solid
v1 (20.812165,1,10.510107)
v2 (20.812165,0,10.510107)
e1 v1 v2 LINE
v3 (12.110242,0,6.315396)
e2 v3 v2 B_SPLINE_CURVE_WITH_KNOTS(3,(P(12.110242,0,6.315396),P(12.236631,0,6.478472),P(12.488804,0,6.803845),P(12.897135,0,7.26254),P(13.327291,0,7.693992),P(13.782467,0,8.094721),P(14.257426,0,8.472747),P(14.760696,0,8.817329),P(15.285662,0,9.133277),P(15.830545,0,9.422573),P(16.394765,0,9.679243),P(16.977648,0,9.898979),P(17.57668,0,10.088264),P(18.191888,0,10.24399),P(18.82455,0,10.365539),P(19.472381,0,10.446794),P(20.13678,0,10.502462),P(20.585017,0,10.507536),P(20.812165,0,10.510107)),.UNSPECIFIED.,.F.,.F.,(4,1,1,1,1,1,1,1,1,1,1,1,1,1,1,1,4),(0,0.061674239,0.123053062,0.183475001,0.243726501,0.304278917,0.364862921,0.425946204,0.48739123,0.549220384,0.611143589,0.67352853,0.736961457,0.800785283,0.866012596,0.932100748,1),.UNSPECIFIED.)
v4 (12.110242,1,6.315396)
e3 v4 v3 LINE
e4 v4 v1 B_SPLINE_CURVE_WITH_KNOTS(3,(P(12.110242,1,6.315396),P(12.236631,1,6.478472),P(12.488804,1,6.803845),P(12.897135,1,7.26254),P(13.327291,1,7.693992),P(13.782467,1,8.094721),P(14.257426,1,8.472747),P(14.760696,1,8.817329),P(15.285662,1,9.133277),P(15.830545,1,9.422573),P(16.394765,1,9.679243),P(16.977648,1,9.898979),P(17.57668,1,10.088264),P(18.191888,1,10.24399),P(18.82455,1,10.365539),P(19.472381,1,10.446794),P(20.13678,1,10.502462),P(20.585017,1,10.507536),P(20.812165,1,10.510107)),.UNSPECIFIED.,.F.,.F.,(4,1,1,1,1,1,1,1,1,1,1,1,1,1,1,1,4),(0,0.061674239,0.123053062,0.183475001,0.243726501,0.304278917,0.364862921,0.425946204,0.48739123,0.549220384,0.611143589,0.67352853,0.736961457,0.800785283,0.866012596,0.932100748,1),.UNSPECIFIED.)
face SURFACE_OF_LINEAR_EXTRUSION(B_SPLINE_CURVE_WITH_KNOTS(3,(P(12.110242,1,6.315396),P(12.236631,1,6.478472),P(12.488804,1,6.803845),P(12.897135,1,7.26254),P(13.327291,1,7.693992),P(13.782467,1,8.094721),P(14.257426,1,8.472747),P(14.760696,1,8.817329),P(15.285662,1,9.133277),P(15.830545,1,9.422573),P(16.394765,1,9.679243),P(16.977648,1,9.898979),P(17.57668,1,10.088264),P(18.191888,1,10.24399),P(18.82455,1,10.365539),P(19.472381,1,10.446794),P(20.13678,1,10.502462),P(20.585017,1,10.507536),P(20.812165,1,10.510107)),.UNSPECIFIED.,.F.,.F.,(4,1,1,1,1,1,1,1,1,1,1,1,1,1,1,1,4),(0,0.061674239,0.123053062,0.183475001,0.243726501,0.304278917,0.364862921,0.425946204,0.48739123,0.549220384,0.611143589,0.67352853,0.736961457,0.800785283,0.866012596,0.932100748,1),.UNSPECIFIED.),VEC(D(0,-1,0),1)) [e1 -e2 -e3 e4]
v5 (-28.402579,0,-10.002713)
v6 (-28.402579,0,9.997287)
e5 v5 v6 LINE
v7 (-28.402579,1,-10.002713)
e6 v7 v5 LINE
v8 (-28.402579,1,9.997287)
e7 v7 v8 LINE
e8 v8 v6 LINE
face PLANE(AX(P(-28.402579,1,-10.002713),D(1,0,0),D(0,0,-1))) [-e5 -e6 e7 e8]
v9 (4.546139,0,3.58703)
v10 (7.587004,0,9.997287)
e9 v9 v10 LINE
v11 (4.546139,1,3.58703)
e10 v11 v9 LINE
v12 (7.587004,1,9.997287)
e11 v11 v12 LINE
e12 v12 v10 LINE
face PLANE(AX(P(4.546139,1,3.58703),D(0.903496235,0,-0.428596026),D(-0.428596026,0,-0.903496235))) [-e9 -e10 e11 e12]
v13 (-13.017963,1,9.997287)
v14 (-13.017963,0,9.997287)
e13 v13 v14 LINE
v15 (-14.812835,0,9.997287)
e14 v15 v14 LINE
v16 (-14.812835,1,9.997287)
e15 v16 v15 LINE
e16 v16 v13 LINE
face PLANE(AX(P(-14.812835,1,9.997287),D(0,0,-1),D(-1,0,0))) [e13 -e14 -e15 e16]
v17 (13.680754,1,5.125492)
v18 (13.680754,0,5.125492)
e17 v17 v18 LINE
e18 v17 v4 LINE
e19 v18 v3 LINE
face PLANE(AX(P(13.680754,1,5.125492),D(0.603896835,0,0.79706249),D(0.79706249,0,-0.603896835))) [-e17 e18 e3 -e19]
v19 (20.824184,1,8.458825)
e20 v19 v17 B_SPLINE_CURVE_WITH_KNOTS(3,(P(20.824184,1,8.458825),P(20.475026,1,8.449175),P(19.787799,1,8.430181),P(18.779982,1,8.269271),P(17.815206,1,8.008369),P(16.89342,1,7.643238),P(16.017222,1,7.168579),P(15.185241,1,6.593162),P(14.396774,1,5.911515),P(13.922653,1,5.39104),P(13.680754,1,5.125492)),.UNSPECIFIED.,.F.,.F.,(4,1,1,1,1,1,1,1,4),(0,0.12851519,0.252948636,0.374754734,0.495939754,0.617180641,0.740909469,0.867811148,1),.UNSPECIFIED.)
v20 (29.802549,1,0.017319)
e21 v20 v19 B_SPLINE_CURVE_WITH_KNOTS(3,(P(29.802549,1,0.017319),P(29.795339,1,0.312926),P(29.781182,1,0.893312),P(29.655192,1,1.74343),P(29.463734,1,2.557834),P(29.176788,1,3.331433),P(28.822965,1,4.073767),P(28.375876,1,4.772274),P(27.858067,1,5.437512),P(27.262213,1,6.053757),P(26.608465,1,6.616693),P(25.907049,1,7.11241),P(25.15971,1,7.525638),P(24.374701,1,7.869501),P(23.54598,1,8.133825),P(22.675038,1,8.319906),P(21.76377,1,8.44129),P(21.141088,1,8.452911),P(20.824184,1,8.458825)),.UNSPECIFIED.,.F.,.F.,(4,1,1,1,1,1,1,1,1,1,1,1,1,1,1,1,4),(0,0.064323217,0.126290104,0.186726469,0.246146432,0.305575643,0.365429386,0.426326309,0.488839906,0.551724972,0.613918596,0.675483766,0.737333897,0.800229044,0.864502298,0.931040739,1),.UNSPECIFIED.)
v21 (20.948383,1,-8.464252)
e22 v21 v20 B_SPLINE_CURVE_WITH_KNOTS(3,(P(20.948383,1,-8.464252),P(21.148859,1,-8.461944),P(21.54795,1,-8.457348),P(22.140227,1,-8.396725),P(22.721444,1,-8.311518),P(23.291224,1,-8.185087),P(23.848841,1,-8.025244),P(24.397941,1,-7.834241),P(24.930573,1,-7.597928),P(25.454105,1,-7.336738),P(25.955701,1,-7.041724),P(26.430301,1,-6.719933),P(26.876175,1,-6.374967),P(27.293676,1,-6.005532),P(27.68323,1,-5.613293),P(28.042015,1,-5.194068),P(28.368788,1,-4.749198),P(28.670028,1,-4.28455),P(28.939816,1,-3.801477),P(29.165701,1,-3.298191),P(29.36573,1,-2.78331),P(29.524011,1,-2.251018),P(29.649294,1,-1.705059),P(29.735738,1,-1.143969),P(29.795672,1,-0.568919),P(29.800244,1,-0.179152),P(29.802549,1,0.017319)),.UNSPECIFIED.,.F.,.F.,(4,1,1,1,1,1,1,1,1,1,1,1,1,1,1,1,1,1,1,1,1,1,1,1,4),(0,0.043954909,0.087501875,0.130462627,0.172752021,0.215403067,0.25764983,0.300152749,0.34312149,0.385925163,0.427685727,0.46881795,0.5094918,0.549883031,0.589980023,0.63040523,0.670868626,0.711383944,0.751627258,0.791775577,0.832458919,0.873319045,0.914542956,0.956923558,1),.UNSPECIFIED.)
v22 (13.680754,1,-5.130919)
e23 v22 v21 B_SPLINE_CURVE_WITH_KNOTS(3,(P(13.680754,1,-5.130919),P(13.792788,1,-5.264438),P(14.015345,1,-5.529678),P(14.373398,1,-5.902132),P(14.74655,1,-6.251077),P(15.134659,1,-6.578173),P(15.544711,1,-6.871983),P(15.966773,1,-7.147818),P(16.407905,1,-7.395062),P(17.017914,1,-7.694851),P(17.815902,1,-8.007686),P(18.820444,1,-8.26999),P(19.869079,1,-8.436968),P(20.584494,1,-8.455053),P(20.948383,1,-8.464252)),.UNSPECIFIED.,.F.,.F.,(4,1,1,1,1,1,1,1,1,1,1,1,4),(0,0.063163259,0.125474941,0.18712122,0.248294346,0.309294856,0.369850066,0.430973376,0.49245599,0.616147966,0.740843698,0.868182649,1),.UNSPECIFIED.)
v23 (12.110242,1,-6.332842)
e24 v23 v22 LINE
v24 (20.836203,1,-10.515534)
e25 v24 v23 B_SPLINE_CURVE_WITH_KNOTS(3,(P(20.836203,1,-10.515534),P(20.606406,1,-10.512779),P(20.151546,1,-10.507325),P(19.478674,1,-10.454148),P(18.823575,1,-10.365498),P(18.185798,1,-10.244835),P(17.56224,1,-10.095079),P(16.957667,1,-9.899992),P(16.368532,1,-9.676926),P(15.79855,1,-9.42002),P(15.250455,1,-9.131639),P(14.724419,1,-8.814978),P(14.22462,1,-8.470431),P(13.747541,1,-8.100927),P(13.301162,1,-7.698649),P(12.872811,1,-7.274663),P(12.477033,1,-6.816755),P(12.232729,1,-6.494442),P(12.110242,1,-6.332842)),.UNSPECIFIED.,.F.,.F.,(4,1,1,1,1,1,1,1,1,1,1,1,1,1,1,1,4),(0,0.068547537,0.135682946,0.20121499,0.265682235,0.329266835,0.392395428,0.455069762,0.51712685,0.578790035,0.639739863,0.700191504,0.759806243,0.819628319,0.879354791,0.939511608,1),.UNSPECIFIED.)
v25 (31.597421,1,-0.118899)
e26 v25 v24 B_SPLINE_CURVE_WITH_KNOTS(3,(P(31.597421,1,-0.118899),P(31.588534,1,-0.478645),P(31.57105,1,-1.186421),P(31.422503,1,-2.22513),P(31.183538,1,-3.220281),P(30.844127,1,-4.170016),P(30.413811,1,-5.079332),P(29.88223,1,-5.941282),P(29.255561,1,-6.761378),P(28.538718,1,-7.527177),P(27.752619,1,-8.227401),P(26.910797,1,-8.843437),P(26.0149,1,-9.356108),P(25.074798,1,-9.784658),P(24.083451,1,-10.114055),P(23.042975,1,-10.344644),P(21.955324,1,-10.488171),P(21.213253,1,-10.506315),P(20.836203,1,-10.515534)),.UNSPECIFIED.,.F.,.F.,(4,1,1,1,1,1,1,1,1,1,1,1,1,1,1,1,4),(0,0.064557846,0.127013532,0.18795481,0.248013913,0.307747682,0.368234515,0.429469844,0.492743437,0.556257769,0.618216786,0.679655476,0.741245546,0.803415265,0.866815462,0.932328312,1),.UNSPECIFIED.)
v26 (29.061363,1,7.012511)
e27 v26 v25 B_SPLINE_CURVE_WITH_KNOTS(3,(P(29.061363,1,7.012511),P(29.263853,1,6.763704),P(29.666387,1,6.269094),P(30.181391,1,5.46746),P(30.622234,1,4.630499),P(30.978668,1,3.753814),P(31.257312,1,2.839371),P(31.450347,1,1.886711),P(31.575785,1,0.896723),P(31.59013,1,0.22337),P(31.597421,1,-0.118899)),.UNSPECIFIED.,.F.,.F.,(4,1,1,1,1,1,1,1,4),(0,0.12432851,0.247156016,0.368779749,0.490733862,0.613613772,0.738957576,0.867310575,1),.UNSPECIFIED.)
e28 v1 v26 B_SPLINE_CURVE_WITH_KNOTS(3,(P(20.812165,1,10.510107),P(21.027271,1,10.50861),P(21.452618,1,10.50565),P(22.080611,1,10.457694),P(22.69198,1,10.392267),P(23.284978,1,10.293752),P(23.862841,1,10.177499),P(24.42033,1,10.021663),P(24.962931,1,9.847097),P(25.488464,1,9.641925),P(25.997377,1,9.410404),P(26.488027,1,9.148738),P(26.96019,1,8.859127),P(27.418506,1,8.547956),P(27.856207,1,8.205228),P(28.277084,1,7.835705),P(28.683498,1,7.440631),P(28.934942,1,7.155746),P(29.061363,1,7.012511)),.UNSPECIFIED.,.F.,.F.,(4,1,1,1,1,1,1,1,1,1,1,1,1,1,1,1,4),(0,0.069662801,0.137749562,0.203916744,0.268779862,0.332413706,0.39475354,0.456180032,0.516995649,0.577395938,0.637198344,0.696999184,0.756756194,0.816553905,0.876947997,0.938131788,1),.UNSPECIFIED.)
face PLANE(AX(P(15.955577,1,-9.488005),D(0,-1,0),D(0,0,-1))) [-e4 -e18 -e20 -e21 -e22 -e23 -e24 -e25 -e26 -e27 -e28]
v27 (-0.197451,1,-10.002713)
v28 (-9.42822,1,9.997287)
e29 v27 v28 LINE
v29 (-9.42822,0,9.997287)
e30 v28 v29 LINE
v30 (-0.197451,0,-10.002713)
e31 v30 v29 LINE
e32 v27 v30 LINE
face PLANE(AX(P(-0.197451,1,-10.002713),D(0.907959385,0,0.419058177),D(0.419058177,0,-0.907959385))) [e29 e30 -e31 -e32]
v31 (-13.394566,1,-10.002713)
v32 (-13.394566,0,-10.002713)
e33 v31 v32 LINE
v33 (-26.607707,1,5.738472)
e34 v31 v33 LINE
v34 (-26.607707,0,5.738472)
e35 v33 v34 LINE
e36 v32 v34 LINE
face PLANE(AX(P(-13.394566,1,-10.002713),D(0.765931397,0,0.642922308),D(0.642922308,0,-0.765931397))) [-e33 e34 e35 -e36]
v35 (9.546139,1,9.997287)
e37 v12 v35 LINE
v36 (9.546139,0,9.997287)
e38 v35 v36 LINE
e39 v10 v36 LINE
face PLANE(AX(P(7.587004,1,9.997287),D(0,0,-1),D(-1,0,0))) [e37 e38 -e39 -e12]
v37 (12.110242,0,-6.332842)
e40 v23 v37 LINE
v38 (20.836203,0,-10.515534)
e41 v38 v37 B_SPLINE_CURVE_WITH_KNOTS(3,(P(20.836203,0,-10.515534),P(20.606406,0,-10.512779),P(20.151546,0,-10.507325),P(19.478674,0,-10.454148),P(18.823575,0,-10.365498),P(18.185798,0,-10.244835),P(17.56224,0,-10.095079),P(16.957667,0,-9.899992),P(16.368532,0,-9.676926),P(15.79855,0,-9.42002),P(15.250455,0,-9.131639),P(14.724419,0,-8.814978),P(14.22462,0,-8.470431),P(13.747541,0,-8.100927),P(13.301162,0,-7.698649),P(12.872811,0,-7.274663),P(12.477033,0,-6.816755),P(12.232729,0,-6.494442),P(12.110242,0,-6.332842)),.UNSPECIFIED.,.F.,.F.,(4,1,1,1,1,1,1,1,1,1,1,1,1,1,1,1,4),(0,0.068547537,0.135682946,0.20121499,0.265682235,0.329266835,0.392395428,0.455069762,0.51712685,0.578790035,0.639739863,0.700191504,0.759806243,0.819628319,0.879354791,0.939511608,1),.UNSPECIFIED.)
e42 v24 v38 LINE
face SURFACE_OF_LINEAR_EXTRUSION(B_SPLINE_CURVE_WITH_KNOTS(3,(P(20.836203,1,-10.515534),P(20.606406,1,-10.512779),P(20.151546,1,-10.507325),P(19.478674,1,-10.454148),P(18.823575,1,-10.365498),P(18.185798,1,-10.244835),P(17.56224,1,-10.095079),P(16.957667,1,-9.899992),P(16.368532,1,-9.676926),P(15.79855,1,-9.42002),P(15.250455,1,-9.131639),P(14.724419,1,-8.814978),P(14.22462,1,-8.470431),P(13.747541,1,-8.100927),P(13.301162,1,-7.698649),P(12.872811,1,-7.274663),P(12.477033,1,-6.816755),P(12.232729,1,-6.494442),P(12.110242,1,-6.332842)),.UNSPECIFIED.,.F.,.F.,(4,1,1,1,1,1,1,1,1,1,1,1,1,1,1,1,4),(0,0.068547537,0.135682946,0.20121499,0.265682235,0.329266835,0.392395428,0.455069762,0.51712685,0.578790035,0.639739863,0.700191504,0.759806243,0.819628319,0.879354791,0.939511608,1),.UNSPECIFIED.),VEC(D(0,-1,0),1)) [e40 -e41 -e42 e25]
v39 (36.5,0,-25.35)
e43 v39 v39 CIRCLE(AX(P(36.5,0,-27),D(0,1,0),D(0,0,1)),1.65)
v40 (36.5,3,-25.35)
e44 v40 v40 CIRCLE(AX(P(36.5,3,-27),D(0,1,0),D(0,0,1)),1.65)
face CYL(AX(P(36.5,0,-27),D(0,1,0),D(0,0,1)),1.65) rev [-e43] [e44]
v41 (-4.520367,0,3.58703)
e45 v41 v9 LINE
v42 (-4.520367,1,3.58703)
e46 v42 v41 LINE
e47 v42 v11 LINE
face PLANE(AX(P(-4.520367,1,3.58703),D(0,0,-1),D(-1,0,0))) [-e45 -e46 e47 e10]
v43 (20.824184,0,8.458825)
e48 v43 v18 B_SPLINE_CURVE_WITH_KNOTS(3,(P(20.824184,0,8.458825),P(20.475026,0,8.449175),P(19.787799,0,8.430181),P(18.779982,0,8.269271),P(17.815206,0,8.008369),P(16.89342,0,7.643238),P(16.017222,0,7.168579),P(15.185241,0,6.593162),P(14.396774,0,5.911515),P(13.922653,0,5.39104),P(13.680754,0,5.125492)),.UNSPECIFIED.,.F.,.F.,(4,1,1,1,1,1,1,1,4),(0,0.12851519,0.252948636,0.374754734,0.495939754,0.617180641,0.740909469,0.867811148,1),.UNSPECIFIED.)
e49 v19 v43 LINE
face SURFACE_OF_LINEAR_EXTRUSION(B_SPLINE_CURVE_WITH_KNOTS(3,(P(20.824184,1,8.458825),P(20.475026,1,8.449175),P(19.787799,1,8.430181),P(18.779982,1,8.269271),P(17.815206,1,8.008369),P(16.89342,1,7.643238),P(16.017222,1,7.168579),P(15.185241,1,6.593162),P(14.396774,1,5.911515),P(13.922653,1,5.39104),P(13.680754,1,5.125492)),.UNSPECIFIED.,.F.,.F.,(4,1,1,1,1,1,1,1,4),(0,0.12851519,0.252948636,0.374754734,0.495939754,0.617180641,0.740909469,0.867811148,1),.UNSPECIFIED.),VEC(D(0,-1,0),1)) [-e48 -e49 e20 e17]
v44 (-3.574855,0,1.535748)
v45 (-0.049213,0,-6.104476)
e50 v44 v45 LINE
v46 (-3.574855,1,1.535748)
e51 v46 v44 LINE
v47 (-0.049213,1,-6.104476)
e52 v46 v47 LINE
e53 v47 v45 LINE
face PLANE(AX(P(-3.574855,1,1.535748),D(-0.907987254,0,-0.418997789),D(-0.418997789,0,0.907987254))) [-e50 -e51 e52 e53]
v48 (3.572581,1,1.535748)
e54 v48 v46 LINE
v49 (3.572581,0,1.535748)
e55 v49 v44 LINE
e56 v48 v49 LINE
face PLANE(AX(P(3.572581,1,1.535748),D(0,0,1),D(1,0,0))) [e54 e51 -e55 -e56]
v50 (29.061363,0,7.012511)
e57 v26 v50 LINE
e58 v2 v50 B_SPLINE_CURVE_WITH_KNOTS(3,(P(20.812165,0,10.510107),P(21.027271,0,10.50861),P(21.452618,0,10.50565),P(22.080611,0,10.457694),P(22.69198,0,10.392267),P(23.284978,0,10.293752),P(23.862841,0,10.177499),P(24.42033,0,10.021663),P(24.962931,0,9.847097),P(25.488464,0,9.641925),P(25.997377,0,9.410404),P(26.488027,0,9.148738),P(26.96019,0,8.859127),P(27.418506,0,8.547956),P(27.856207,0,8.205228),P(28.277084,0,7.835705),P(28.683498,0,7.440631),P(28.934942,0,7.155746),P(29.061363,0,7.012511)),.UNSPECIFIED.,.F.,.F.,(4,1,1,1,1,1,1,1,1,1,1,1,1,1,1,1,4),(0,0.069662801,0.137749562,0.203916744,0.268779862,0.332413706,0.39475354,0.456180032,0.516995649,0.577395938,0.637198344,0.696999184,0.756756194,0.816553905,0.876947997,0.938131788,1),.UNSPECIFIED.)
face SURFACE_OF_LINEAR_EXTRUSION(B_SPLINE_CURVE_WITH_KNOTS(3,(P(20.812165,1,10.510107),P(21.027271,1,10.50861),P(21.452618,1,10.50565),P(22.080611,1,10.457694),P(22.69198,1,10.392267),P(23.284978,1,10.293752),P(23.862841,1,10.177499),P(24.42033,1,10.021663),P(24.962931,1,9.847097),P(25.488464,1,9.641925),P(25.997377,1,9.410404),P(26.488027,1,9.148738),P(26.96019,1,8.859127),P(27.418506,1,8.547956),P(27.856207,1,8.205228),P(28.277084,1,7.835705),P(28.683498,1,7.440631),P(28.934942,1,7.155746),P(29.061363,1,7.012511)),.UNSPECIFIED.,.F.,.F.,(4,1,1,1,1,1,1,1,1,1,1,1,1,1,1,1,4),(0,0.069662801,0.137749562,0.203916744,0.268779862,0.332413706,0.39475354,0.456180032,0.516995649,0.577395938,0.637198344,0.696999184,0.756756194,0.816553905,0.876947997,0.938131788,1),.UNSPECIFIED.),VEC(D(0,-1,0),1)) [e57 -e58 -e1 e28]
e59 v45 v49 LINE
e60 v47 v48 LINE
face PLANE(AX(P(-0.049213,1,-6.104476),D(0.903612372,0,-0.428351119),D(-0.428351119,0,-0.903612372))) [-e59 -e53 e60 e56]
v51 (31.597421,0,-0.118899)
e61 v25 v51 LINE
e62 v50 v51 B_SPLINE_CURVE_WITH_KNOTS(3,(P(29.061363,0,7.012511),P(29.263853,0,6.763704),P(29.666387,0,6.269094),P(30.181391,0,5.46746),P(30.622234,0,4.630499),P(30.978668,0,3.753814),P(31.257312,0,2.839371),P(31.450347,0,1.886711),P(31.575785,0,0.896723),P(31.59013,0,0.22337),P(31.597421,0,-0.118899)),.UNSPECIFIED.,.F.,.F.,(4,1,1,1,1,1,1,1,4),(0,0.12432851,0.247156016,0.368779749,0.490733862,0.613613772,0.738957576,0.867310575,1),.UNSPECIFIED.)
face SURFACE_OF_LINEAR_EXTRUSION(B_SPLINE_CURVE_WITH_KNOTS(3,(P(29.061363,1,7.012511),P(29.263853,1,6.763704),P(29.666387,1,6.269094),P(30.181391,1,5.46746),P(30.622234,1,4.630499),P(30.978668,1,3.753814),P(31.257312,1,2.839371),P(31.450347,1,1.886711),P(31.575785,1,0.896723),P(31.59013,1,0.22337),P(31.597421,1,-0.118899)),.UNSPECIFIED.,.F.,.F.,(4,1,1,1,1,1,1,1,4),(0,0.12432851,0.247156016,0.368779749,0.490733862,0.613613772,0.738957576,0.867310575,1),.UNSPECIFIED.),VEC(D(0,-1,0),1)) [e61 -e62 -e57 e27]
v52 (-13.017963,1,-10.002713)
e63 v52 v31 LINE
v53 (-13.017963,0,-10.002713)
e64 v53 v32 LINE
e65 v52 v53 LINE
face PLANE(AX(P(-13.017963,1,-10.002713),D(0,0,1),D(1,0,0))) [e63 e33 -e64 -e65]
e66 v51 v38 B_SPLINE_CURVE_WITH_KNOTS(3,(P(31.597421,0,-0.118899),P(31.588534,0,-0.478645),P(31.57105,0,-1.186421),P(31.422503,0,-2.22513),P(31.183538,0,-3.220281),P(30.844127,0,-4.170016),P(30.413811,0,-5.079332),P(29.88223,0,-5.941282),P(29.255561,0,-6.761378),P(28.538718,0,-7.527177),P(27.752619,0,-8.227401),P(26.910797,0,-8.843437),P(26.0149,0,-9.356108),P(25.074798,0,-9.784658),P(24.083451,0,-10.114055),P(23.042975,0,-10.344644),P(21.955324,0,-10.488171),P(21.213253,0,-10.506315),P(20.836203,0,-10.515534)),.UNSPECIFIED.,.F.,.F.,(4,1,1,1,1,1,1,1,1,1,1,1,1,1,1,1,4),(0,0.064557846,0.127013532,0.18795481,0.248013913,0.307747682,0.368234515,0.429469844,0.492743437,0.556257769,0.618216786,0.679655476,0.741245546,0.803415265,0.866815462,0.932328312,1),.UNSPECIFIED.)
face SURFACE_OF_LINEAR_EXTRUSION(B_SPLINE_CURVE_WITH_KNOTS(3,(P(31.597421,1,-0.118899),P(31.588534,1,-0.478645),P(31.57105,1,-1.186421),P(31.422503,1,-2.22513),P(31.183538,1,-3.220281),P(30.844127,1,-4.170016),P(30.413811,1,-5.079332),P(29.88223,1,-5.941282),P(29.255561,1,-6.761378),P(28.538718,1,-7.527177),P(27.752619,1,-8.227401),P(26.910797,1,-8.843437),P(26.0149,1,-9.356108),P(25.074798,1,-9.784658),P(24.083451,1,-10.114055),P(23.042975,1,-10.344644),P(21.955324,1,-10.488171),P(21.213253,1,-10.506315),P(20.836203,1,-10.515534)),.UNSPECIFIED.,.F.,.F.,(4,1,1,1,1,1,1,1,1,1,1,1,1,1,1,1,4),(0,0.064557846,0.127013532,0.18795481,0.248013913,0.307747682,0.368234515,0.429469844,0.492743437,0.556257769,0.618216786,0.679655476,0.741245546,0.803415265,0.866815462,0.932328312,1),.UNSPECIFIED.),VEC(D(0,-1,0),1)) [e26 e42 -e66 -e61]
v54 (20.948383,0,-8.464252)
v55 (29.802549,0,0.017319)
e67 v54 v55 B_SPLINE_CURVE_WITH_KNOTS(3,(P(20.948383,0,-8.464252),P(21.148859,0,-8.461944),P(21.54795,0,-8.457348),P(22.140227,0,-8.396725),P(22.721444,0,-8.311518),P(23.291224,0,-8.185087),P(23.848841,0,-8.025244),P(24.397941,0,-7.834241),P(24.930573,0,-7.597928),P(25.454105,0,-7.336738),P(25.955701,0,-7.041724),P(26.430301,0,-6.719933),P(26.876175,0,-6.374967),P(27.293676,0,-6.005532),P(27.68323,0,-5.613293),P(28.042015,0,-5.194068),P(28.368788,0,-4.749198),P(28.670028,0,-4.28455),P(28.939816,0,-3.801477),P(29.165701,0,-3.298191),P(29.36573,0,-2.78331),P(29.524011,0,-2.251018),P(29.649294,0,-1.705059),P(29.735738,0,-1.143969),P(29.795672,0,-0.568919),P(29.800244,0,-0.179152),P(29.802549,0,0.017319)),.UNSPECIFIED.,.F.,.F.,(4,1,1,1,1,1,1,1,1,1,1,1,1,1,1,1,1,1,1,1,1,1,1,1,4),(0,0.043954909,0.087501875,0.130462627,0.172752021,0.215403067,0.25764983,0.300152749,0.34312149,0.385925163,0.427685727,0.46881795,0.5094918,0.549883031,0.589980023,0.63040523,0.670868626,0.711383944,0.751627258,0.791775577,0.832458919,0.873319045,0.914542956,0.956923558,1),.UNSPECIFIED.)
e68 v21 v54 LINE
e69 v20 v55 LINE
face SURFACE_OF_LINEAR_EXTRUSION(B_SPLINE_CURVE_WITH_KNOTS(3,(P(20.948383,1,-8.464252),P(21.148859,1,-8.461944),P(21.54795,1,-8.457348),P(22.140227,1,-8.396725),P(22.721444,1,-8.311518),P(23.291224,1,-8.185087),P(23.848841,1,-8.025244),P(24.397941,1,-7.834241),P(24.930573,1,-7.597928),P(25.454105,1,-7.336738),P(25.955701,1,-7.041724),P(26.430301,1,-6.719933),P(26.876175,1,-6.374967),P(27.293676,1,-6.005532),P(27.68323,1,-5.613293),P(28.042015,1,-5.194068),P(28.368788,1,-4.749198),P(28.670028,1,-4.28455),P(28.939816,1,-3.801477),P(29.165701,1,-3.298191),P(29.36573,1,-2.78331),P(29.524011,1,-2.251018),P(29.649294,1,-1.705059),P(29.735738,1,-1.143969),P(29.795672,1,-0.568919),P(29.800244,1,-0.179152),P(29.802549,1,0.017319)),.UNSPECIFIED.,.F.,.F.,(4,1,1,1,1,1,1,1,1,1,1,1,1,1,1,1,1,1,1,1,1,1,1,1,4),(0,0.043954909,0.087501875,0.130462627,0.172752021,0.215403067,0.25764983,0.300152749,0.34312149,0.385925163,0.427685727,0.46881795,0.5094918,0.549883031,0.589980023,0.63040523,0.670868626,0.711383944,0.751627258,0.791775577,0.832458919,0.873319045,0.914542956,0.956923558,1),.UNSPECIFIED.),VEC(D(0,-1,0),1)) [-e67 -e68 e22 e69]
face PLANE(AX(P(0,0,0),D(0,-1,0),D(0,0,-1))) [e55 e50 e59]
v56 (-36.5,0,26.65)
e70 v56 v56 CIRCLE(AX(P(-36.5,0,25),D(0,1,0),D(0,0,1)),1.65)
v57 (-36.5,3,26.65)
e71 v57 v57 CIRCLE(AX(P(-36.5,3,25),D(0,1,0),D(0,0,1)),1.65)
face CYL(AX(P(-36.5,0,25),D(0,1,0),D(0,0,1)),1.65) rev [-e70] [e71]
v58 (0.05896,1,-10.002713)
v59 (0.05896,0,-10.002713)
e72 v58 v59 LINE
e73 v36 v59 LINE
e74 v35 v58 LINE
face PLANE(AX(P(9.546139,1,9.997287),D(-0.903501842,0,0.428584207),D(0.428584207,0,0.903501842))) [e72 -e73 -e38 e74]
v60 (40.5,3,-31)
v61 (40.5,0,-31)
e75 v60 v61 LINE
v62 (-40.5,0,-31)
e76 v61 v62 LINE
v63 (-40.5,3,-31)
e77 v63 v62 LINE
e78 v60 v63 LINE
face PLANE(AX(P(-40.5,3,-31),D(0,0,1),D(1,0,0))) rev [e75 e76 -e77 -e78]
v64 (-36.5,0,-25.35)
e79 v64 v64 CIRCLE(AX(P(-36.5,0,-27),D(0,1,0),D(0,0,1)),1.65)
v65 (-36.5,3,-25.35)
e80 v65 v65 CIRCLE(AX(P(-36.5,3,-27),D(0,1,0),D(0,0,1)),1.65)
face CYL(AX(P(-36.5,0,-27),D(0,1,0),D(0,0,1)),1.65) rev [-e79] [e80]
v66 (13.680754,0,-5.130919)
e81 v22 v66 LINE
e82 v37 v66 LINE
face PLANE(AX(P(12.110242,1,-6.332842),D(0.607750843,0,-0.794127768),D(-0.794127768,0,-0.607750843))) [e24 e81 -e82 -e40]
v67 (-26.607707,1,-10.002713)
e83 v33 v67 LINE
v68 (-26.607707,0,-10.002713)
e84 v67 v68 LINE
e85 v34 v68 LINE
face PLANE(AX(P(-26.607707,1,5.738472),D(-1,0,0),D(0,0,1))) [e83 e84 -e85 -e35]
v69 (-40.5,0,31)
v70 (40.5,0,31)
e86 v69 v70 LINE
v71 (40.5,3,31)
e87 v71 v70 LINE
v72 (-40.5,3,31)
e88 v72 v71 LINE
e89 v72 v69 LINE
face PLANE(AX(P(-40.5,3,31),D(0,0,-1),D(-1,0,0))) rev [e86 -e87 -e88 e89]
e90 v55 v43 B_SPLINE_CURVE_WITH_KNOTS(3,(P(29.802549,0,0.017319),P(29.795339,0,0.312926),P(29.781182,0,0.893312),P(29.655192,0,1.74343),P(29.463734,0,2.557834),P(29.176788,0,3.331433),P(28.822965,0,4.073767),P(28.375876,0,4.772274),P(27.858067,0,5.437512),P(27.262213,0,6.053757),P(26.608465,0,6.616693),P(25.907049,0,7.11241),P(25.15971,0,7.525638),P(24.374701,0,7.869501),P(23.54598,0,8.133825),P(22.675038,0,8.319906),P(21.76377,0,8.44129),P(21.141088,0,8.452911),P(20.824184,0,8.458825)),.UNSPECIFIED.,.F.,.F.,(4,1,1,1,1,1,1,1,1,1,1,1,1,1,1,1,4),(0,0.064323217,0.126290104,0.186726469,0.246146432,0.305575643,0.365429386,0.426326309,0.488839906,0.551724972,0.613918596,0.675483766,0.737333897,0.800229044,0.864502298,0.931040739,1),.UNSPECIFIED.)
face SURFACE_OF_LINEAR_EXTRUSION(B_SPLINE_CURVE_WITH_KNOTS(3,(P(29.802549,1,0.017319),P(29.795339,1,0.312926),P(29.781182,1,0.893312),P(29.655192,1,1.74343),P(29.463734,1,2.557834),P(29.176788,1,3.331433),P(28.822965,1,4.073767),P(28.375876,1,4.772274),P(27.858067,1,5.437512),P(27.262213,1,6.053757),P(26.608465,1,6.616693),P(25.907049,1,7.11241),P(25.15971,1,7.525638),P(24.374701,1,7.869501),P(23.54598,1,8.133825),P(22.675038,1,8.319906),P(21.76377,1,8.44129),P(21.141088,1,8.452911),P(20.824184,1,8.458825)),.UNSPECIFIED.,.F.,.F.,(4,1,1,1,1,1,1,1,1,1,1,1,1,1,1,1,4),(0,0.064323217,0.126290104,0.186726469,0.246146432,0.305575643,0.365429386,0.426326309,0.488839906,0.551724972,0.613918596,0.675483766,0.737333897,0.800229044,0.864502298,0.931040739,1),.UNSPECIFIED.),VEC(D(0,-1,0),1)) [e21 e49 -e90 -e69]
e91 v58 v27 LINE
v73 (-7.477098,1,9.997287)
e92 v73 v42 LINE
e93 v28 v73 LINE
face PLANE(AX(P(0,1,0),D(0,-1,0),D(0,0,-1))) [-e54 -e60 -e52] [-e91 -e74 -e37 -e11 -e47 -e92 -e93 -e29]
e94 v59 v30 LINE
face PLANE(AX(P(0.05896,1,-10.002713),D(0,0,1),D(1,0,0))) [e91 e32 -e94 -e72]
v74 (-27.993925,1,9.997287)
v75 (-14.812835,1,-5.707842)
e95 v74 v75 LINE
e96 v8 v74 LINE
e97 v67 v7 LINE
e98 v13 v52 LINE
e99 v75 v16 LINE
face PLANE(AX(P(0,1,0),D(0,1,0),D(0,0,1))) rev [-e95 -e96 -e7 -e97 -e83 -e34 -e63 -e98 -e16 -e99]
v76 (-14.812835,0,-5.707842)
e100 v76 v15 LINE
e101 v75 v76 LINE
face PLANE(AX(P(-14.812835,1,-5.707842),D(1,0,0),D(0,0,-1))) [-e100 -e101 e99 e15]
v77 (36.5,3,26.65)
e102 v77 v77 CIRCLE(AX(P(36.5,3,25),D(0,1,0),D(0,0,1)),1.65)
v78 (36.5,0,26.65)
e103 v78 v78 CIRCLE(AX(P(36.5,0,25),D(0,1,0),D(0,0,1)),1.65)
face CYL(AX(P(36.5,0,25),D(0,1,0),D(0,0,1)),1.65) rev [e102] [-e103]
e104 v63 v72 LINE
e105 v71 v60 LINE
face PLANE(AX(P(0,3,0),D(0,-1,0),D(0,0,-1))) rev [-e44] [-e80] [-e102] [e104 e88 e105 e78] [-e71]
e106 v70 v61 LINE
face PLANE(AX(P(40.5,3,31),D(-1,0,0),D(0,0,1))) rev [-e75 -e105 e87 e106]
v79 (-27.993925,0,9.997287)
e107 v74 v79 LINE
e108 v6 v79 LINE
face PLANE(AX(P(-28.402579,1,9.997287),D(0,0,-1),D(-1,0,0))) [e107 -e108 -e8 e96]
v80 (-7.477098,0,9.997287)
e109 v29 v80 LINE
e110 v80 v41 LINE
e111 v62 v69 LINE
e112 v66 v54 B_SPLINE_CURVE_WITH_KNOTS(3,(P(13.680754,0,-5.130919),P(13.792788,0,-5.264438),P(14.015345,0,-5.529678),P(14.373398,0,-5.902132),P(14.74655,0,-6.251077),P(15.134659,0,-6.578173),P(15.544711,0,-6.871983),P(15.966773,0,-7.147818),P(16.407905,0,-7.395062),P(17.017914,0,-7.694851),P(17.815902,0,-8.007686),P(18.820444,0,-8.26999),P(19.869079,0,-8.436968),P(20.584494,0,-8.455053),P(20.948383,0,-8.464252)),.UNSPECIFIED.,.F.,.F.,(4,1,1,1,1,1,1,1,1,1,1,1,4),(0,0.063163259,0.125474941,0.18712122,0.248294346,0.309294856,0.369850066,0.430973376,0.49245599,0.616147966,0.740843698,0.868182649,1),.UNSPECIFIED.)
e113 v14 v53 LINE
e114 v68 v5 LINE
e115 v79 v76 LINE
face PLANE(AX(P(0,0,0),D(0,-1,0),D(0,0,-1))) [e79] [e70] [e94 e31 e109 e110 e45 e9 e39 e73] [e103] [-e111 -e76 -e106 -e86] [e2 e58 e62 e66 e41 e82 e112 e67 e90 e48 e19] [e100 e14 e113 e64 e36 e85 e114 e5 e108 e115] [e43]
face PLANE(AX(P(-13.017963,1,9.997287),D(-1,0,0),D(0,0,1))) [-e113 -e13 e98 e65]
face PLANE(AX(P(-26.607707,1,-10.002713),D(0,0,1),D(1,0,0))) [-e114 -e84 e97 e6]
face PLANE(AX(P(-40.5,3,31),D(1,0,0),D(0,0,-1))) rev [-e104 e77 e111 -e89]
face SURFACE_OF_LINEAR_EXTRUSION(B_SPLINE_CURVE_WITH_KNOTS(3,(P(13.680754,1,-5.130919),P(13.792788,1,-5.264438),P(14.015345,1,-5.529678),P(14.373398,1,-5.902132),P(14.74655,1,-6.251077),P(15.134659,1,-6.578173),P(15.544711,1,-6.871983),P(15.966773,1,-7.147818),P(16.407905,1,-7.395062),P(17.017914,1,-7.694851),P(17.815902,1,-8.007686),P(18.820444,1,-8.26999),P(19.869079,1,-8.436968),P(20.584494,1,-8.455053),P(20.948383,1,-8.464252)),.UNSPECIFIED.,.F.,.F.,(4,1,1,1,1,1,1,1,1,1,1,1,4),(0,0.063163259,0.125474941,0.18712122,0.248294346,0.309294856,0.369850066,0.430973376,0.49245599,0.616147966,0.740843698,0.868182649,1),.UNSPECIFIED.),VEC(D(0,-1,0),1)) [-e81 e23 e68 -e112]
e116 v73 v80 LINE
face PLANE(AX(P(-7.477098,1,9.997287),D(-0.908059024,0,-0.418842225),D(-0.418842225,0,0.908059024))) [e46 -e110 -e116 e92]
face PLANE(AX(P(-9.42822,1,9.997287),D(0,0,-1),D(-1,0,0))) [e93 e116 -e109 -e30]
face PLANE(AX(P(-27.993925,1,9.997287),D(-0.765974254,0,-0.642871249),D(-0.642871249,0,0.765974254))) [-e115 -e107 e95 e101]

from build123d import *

# Parameters (mm, degrees)
SKETCH1_W      = 81
SKETCH1_H      = 62
EXTRUDE1_DEPTH = 3
SKETCH2_R      = 1.65
EXTRUDE2_DEPTH = 3
EXTRUDE3_START = -1
EXTRUDE3_DEPTH = 1


# Read off the part's stored shape, not the designer's step: Extrude3
with BuildPart() as part:
    # Sketch1 → Extrude1 (new body)
    with BuildSketch(Plane(origin=(0, 0, 0), x_dir=(1, 0, 0), z_dir=(0, 1, 0))):
        Rectangle(SKETCH1_W, SKETCH1_H)
    extrude(amount=EXTRUDE1_DEPTH)

    # Sketch2 → Extrude2 (cut)
    with BuildSketch(Plane(origin=(0, 3, 0), x_dir=(1, 0, 0), z_dir=(0, 1, 0))):
        with Locations(Location((-36.5, 27, 0), (0, 0, 270))):
            Circle(SKETCH2_R)
        with Locations(Location((36.5, 27, 0), (0, 0, 270))):
            Circle(SKETCH2_R)
        with Locations(Location((36.5, -25, 0), (0, 0, 270))):
            Circle(SKETCH2_R)
        with Locations(Location((-36.5, -25, 0), (0, 0, 270))):
            Circle(SKETCH2_R)
    extrude(amount=-EXTRUDE2_DEPTH, mode=Mode.SUBTRACT)

    # Extrude3 outline → Extrude3 (cut)
    # profile 1 of 3: a face of its own
    with BuildSketch(Plane(origin=(0, 0, 0), x_dir=(-1, 0, 0), z_dir=(0, -1, 0)).offset(EXTRUDE3_START)):
        with BuildLine():
            add(Edge.make_bspline(
                [(-20.83620317, 10.515533954), (-20.606406188, 10.512778879), (-20.151546203, 10.507325485), (-19.478673903, 10.45414753), (-18.823574892, 10.365498351), (-18.185797852, 10.244835095), (-17.562240045, 10.095078972), (-16.95766724, 9.899991553), (-16.368531887, 9.67692566), (-15.798549554, 9.420020141), (-15.250454982, 9.131638761), (-14.724418876, 8.814978055), (-14.224619684, 8.470430595), (-13.74754055, 8.100926736), (-13.301162201, 7.698649254), (-12.872810895, 7.274662991), (-12.477033305, 6.816755425), (-12.232729334, 6.494441517), (-12.110241632, 6.332841646)],
                knots=[0, 0, 0, 0, 0.068547537, 0.135682946, 0.20121499, 0.265682235, 0.329266835, 0.392395428, 0.455069762, 0.51712685, 0.578790035, 0.639739863, 0.700191504, 0.759806243, 0.819628319, 0.879354791, 0.939511608, 1, 1, 1, 1], degree=3))
            add(Edge.make_bspline(
                [(-31.597421119, 0.118899339), (-31.588534298, 0.478644788), (-31.571050034, 1.186421499), (-31.422502632, 2.225129804), (-31.183538082, 3.220280654), (-30.84412729, 4.170016338), (-30.413810997, 5.079332225), (-29.882230346, 5.941281967), (-29.255560962, 6.761377965), (-28.538717718, 7.527176544), (-27.752618659, 8.227401416), (-26.910796866, 8.843436866), (-26.014900026, 9.356108386), (-25.074798016, 9.784657885), (-24.083451264, 10.114054818), (-23.042974869, 10.344644456), (-21.955323928, 10.488170835), (-21.213252924, 10.50631488), (-20.83620317, 10.515533954)],
                knots=[0, 0, 0, 0, 0.064557846, 0.127013532, 0.18795481, 0.248013913, 0.307747682, 0.368234515, 0.429469844, 0.492743437, 0.556257769, 0.618216786, 0.679655476, 0.741245546, 0.803415265, 0.866815462, 0.932328312, 1, 1, 1, 1], degree=3))
            add(Edge.make_bspline(
                [(-29.061363426, -7.012510918), (-29.263852818, -6.763704124), (-29.666386971, -6.26909435), (-30.181390877, -5.467460171), (-30.62223405, -4.630498978), (-30.978667883, -3.753813671), (-31.257312072, -2.839371458), (-31.450347473, -1.886711375), (-31.575785213, -0.896723134), (-31.59012972, -0.223370056), (-31.597421119, 0.118899339)],
                knots=[0, 0, 0, 0, 0.12432851, 0.247156016, 0.368779749, 0.490733862, 0.613613772, 0.738957576, 0.867310575, 1, 1, 1, 1], degree=3))
            add(Edge.make_bspline(
                [(-20.812164709, -10.510107071), (-21.027271377, -10.508609971), (-21.452618178, -10.505649641), (-22.080611044, -10.457694398), (-22.691980077, -10.39226733), (-23.28497794, -10.293752296), (-23.862840654, -10.177498924), (-24.420329708, -10.021663172), (-24.96293091, -9.847096505), (-25.488464286, -9.641925153), (-25.997376856, -9.41040411), (-26.488027207, -9.148738059), (-26.960189678, -8.859127403), (-27.418506368, -8.547955915), (-27.856206846, -8.205228476), (-28.277084134, -7.83570485), (-28.683498284, -7.440630503), (-28.934942198, -7.155745627), (-29.061363426, -7.012510918)],
                knots=[0, 0, 0, 0, 0.069662801, 0.137749562, 0.203916744, 0.268779862, 0.332413706, 0.39475354, 0.456180032, 0.516995649, 0.577395938, 0.637198344, 0.696999184, 0.756756194, 0.816553905, 0.876947997, 0.938131788, 1, 1, 1, 1], degree=3))
            add(Edge.make_bspline(
                [(-12.110241632, -6.315395533), (-12.236630831, -6.478472401), (-12.488803832, -6.803845008), (-12.897135358, -7.262540493), (-13.327291343, -7.693992124), (-13.782466829, -8.094721388), (-14.257425638, -8.472746906), (-14.760695994, -8.817328799), (-15.285661894, -9.133276709), (-15.830544631, -9.422573421), (-16.394765275, -9.679243404), (-16.977647761, -9.89897922), (-17.576679621, -10.088264303), (-18.19188824, -10.243989655), (-18.824549708, -10.365538706), (-19.472380989, -10.446793991), (-20.136780275, -10.502462073), (-20.585016968, -10.507535878), (-20.812164709, -10.510107071)],
                knots=[0, 0, 0, 0, 0.061674239, 0.123053062, 0.183475001, 0.243726501, 0.304278917, 0.364862921, 0.425946204, 0.48739123, 0.549220384, 0.611143589, 0.67352853, 0.736961457, 0.800785283, 0.866012596, 0.932100748, 1, 1, 1, 1], degree=3))
            Line((-12.110241632, -6.315395533), (-13.680754452, -5.125491687))
            add(Edge.make_bspline(
                [(-20.824183939, -8.45882502), (-20.475025716, -8.44917485), (-19.787798808, -8.430181007), (-18.779981515, -8.269271012), (-17.815205711, -8.008368624), (-16.893419503, -7.64323764), (-16.017221524, -7.168578852), (-15.185240608, -6.593162409), (-14.396774491, -5.911514794), (-13.922652878, -5.391039775), (-13.680754452, -5.125491687)],
                knots=[0, 0, 0, 0, 0.12851519, 0.252948636, 0.374754734, 0.495939754, 0.617180641, 0.740909469, 0.867811148, 1, 1, 1, 1], degree=3))
            add(Edge.make_bspline(
                [(-29.802549324, -0.01731861), (-29.795338929, -0.312926152), (-29.781182276, -0.893312351), (-29.655191796, -1.743430126), (-29.463734131, -2.557833976), (-29.176787978, -3.331433075), (-28.822964831, -4.07376655), (-28.375875623, -4.772274283), (-27.858066838, -5.437511795), (-27.262213012, -6.053757211), (-26.608465493, -6.616692784), (-25.907048855, -7.112410392), (-25.159710068, -7.525638292), (-24.374700752, -7.869500844), (-23.545980101, -8.133825002), (-22.675038373, -8.319905708), (-21.763769829, -8.441289596), (-21.141087544, -8.452910671), (-20.824183939, -8.45882502)],
                knots=[0, 0, 0, 0, 0.064323217, 0.126290104, 0.186726469, 0.246146432, 0.305575643, 0.365429386, 0.426326309, 0.488839906, 0.551724972, 0.613918596, 0.675483766, 0.737333897, 0.800229044, 0.864502298, 0.931040739, 1, 1, 1, 1], degree=3))
            add(Edge.make_bspline(
                [(-20.948382657, 8.464251903), (-21.148858653, 8.461943546), (-21.54795004, 8.457348255), (-22.140227031, 8.396724682), (-22.721444466, 8.311517768), (-23.291224273, 8.185087349), (-23.848841179, 8.025243812), (-24.397940619, 7.834241447), (-24.930572618, 7.597928076), (-25.454105408, 7.336738019), (-25.955700899, 7.041724049), (-26.430301172, 6.719933467), (-26.876175275, 6.374967202), (-27.293675916, 6.005532308), (-27.683229906, 5.613292534), (-28.042014539, 5.194067725), (-28.368788312, 4.749198162), (-28.670028455, 4.284550119), (-28.939815503, 3.801477024), (-29.165700528, 3.298190907), (-29.365729798, 2.783310318), (-29.524011185, 2.25101797), (-29.649294138, 1.705059308), (-29.735737928, 1.143969092), (-29.795672049, 0.568919494), (-29.800244489, 0.179151993), (-29.802549324, -0.01731861)],
                knots=[0, 0, 0, 0, 0.043954909, 0.087501875, 0.130462627, 0.172752021, 0.215403067, 0.25764983, 0.300152749, 0.34312149, 0.385925163, 0.427685727, 0.46881795, 0.5094918, 0.549883031, 0.589980023, 0.63040523, 0.670868626, 0.711383944, 0.751627258, 0.791775577, 0.832458919, 0.873319045, 0.914542956, 0.956923558, 1, 1, 1, 1], degree=3))
            add(Edge.make_bspline(
                [(-13.680754452, 5.13091857), (-13.7927881, 5.264438397), (-14.015344939, 5.529677916), (-14.373397525, 5.902132455), (-14.74654977, 6.251076806), (-15.134659034, 6.578173261), (-15.544711145, 6.871983351), (-15.966772852, 7.147818225), (-16.407904539, 7.395062442), (-17.017914451, 7.694850934), (-17.815902156, 8.007686106), (-18.820444093, 8.269990285), (-19.869078942, 8.436968431), (-20.584493797, 8.45505324), (-20.948382657, 8.464251903)],
                knots=[0, 0, 0, 0, 0.063163259, 0.125474941, 0.18712122, 0.248294346, 0.309294856, 0.369850066, 0.430973376, 0.49245599, 0.616147966, 0.740843698, 0.868182649, 1, 1, 1, 1], degree=3))
            Line((-13.680754452, 5.13091857), (-12.110241632, 6.332841646))
        make_face()
    # profile 2 of 3: a face of its own
    with BuildSketch(Plane(origin=(0, 0, 0), x_dir=(-1, 0, 0), z_dir=(0, -1, 0)).offset(EXTRUDE3_START)):
        Polygon((13.017963497, -9.997286559), (14.812835291, -9.997286559), (14.812835291, 5.707841646), (27.993925035, -9.997286559), (28.402578881, -9.997286559), (28.402578881, 10.002713441), (26.607707086, 10.002713441), (26.607707086, -5.738472456), (13.394566061, 10.002713441), (13.017963497, 10.002713441), align=None)
    # profile 3 of 3: a face of its own
    with BuildSketch(Plane(origin=(0, 0, 0), x_dir=(-1, 0, 0), z_dir=(0, -1, 0)).offset(EXTRUDE3_START)):
        Polygon((7.477098112, -9.997286559), (9.428219907, -9.997286559), (0.197450676, 10.002713441), (-0.05895958, 10.002713441), (-9.546139067, -9.997286559), (-7.587004452, -9.997286559), (-4.546139067, -3.587030148), (4.520367343, -3.587030148), align=None)
        Polygon((0.049213497, 6.104476262), (3.574854522, -1.535748097), (-3.572581375, -1.535748097), align=None, mode=Mode.SUBTRACT)
    extrude(amount=EXTRUDE3_DEPTH, mode=Mode.SUBTRACT)


solid = part.part
